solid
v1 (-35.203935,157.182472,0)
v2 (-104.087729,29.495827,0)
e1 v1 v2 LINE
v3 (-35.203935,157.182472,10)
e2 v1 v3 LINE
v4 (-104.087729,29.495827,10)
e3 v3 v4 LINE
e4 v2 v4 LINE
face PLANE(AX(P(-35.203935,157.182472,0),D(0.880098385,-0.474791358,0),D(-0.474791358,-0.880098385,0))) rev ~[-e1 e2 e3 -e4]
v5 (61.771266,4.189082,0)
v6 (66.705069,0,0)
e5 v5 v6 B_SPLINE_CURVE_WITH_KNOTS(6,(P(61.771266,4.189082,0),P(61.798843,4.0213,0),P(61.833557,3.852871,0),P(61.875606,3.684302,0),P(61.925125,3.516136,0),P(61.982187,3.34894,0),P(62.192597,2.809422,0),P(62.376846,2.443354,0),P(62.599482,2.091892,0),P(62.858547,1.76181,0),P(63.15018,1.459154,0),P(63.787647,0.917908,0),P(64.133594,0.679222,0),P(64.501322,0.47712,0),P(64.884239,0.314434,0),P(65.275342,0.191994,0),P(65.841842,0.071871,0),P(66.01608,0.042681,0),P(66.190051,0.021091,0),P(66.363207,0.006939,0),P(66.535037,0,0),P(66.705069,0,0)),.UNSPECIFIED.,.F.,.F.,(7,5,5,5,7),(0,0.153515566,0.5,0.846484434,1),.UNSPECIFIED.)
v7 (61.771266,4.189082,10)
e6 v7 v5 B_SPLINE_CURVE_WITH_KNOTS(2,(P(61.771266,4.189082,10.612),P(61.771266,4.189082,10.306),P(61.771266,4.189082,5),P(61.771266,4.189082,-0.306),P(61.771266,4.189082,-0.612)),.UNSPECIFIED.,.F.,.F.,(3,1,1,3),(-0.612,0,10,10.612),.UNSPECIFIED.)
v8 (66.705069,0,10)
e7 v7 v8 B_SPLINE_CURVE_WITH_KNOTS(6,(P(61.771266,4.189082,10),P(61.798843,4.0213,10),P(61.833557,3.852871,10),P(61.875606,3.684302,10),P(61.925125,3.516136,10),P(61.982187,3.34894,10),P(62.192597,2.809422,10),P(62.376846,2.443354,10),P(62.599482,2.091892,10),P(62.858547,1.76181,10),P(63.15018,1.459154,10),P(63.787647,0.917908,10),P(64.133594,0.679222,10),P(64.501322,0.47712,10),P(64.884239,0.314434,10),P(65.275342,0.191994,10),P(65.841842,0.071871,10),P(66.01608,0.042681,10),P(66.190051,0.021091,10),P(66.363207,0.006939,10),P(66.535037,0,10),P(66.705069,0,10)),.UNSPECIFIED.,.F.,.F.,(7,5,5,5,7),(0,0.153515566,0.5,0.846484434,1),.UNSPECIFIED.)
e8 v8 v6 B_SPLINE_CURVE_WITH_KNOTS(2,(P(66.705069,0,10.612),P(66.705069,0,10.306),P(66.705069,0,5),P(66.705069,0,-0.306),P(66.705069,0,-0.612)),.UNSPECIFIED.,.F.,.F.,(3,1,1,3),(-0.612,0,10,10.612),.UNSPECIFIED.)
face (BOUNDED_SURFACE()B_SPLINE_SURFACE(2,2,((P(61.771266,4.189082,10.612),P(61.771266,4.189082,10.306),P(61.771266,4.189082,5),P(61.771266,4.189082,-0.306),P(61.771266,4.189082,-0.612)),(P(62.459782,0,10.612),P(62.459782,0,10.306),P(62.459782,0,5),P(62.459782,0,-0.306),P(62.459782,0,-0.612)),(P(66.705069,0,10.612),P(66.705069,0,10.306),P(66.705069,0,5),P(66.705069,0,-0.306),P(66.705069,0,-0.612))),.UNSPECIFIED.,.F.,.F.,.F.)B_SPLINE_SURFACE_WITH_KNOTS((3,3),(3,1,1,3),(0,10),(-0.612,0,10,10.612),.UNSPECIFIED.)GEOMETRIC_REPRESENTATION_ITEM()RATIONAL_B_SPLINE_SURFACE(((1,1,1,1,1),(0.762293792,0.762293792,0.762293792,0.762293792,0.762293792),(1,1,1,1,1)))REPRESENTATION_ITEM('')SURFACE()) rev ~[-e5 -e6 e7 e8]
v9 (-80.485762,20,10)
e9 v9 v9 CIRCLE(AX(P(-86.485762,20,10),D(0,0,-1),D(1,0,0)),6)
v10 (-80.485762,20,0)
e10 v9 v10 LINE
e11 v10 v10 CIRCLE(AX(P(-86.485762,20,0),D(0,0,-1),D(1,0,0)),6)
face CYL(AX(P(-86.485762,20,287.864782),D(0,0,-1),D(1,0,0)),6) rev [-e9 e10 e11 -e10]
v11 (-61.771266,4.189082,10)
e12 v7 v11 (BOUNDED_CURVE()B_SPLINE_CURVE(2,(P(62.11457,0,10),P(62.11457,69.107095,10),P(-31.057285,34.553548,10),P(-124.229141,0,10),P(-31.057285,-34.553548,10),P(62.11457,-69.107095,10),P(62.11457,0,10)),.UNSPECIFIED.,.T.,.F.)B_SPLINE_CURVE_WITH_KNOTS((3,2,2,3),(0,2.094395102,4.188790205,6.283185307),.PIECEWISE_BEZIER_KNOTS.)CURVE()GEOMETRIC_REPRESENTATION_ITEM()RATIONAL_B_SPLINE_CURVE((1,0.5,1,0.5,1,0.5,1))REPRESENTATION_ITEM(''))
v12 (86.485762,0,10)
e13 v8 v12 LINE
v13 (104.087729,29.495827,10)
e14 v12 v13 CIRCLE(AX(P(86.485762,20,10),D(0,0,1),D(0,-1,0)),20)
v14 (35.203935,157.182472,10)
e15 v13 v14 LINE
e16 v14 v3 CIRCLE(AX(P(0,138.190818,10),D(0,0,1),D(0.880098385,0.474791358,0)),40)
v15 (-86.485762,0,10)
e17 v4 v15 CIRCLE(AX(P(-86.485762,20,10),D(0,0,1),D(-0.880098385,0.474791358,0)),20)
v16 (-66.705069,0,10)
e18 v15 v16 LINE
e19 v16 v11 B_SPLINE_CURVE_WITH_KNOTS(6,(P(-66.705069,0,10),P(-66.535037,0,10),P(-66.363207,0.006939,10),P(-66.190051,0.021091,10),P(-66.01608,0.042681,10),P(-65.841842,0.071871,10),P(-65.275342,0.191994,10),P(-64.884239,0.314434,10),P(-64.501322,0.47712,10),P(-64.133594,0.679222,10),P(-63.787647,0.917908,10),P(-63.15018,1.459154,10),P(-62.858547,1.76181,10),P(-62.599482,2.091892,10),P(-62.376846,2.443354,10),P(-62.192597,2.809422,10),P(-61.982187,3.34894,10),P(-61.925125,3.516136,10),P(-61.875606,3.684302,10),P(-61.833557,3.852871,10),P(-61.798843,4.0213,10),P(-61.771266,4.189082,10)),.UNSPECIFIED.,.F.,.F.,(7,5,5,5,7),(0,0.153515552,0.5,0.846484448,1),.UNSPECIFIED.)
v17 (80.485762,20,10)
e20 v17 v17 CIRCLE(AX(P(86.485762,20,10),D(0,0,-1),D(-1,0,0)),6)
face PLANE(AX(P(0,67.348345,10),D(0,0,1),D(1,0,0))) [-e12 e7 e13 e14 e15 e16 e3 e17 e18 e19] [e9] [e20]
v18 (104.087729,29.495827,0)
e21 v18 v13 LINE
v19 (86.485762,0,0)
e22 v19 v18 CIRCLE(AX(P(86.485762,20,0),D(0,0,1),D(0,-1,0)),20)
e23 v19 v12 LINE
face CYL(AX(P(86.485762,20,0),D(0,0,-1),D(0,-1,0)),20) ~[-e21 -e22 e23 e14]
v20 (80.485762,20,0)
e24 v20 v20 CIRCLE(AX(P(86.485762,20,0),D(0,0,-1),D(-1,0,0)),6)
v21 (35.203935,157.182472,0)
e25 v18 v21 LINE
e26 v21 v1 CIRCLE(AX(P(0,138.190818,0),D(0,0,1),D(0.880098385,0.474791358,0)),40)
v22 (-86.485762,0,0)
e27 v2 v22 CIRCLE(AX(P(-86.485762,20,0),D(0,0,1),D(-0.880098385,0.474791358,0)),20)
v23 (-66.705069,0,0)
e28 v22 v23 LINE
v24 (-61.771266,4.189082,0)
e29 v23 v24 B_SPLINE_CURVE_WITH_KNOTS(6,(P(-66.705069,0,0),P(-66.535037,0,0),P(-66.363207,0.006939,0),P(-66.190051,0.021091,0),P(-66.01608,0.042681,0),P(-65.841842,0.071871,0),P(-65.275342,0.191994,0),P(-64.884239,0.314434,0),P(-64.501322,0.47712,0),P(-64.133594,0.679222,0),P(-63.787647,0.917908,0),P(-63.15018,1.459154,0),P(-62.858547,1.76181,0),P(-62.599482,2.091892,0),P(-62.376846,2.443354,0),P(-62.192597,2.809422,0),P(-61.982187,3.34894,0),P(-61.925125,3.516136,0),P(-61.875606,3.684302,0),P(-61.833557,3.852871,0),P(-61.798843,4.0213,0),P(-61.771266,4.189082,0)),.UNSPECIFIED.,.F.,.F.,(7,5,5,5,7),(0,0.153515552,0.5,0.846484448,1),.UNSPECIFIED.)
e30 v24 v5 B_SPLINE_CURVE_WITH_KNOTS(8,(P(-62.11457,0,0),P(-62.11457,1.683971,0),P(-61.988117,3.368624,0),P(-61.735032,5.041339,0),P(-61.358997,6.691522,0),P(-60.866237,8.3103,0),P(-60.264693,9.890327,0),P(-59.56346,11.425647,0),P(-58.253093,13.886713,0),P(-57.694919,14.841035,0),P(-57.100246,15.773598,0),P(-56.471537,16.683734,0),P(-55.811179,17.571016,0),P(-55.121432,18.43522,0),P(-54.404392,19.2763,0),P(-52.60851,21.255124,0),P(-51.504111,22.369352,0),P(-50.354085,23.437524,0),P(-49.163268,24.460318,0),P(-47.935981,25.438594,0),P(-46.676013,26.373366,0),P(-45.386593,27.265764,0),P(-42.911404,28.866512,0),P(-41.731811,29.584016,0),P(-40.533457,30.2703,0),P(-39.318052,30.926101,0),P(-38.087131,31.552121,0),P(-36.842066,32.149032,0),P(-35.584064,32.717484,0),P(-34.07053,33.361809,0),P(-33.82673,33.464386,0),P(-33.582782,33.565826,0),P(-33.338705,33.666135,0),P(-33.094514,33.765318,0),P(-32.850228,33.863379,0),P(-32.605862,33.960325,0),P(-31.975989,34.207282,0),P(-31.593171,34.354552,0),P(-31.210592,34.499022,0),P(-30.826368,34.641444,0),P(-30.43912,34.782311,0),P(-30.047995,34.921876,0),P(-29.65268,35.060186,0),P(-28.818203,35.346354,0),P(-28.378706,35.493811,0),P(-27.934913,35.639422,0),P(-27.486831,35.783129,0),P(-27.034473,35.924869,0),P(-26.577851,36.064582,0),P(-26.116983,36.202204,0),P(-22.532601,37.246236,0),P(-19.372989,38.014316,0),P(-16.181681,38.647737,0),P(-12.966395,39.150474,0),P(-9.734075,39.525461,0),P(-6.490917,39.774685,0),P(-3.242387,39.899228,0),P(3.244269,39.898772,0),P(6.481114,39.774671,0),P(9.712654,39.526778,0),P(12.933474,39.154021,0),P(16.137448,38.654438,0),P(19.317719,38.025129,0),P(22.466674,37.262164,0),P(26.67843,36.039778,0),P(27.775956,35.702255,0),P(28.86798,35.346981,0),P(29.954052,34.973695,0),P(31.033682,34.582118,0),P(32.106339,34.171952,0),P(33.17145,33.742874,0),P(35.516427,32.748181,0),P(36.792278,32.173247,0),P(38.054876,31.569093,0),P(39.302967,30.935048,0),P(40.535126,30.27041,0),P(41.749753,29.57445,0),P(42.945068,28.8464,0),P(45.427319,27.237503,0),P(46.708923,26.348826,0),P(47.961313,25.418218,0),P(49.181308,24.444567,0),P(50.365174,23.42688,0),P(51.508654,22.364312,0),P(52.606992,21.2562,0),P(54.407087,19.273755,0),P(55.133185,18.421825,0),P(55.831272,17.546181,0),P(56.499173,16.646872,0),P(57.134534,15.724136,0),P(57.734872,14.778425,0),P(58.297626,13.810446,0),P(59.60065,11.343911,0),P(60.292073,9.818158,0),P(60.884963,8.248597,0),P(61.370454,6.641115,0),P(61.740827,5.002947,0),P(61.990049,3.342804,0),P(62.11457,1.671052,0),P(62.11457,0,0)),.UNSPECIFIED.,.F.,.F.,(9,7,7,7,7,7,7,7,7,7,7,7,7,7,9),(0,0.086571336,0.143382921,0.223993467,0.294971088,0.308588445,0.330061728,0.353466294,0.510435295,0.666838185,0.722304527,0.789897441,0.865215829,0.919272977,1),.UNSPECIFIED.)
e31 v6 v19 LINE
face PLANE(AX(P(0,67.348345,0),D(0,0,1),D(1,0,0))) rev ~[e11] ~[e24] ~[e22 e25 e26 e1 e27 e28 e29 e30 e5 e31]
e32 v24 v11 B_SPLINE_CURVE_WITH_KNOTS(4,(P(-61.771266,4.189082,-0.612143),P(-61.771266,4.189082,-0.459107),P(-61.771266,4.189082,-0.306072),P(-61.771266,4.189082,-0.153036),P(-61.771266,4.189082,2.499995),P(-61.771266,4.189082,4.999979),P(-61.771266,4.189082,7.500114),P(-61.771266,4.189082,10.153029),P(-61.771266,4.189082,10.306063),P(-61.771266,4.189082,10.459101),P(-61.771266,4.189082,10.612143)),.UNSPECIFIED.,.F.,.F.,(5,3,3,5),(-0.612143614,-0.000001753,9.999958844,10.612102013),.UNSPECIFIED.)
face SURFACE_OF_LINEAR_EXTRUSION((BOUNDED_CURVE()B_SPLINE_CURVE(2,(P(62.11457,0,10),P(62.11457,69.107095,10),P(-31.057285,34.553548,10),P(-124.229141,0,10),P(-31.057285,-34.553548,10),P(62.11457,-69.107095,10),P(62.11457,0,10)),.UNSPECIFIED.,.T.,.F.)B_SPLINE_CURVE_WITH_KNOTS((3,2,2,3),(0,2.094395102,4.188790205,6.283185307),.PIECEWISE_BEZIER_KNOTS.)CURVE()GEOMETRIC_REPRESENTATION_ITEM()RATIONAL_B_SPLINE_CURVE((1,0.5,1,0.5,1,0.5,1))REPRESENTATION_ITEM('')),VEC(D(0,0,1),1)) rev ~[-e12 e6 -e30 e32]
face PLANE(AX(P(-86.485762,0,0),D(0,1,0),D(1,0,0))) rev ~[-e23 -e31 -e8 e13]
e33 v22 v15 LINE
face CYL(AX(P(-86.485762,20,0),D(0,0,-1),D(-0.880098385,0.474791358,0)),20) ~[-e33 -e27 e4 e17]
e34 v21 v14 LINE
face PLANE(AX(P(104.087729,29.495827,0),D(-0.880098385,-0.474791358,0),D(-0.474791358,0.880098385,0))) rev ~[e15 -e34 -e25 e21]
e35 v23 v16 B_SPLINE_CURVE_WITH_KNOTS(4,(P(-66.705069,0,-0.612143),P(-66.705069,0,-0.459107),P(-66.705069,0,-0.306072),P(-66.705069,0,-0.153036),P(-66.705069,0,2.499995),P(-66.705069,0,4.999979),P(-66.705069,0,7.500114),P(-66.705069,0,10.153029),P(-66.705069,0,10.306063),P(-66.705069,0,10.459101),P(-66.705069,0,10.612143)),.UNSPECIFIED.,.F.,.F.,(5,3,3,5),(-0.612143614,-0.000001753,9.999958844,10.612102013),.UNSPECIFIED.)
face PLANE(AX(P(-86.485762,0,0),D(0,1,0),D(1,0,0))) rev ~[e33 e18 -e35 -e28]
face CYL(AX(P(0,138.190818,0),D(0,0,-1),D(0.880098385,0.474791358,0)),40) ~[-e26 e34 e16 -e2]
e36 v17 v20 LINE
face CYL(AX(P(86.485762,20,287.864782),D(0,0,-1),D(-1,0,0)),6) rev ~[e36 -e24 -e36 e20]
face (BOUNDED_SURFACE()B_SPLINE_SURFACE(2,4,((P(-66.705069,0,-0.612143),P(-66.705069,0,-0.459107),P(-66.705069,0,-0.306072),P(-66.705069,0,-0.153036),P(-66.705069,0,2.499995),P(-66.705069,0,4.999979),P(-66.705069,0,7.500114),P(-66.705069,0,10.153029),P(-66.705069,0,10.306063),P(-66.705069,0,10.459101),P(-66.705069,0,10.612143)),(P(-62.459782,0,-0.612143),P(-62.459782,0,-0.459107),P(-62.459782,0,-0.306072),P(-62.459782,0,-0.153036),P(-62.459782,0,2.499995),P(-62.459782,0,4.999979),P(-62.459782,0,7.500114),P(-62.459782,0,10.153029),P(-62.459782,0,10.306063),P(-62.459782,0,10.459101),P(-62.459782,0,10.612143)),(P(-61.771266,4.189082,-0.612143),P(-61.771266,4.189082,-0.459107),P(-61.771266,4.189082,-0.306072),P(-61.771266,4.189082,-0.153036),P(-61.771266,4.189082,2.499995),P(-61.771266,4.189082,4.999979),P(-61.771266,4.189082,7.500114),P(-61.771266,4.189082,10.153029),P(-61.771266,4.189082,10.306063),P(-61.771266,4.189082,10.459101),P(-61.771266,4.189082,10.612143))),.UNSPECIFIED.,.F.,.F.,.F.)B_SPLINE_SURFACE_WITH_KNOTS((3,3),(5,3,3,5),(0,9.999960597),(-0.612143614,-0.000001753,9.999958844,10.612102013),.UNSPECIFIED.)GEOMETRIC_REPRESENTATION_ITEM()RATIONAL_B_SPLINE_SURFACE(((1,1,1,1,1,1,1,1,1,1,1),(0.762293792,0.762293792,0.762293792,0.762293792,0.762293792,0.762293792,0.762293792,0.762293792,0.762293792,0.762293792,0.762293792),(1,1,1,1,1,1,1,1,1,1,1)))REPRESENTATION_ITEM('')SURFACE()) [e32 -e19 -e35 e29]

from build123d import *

# Parameters (mm, degrees)
F1_DEPTH = 10
F3_D     = 12
F5_DEPTH = 25
F6_R     = 5


# Not quite as in the source:
# - a pattern or mirror of a feature is missing from the dataset's text; its kind, count and spacing are read off the source's solid


with BuildPart() as f1:
    # F0 (on Top) → F1 (new body)
    with BuildSketch(Plane.XY):
        with BuildLine():
            Line((-86.4857615178, 0), (0, 0))
            Line((0, 0), (86.4857615178, 0))
            ThreePointArc((86.4857615178, 0), (103.6601107493, 9.7510132951), (104.0877292116, 29.4958271523))
            Line((104.0877292116, 29.4958271523), (35.2039353876, 157.1824724621))
            ThreePointArc((35.2039353876, 157.1824724621), (0, 178.1908181575), (-35.2039353876, 157.1824724621))
            Line((-35.2039353876, 157.1824724621), (-104.0877292116, 29.4958271523))
            ThreePointArc((-104.0877292116, 29.4958271523), (-103.6601107493, 9.7510132951), (-86.4857615178, 0))
        make_face()
    extrude(amount=F1_DEPTH)

    # F3 (through all)
    with Locations(Plane.XY.offset(10)):
        with Locations((86.4857615178, 20)):
            f3 = Hole(F3_D / 2)

    # F3_copies: F3 across plane
    add(f3.mirror(Plane(origin=(0, 0, 0), x_dir=(0, 0, -1), z_dir=(-1, 0, 0))), mode=Mode.SUBTRACT)

    # F4 (on face) → F5 (cut)
    with BuildSketch(Plane.XY.offset(10)):
        with BuildLine():
            add(Edge.make_bspline(
                [(62.1145702899, 0), (62.1145702899, 69.1070951712), (-31.0572851449, 34.5535475856), (-124.2291405797, 0), (-31.0572851449, -34.5535475856), (62.1145702899, -69.1070951712), (62.1145702899, 0)],
                knots=[0, 0, 0, 2.0943951024, 2.0943951024, 4.1887902048, 4.1887902048, 6.2831853072, 6.2831853072, 6.2831853072], degree=2, weights=[1, 0.5, 1, 0.5, 1, 0.5, 1]))
        make_face()
    extrude(amount=-F5_DEPTH, mode=Mode.SUBTRACT)

    # F6
    f6_edges = [f1.edges().sort_by_distance(p)[0] for p in [
        (-62.11457, 0, 5),
        (62.11457, 0, 5),
    ]]
    fillet(f6_edges, radius=F6_R)


solid = f1.part
